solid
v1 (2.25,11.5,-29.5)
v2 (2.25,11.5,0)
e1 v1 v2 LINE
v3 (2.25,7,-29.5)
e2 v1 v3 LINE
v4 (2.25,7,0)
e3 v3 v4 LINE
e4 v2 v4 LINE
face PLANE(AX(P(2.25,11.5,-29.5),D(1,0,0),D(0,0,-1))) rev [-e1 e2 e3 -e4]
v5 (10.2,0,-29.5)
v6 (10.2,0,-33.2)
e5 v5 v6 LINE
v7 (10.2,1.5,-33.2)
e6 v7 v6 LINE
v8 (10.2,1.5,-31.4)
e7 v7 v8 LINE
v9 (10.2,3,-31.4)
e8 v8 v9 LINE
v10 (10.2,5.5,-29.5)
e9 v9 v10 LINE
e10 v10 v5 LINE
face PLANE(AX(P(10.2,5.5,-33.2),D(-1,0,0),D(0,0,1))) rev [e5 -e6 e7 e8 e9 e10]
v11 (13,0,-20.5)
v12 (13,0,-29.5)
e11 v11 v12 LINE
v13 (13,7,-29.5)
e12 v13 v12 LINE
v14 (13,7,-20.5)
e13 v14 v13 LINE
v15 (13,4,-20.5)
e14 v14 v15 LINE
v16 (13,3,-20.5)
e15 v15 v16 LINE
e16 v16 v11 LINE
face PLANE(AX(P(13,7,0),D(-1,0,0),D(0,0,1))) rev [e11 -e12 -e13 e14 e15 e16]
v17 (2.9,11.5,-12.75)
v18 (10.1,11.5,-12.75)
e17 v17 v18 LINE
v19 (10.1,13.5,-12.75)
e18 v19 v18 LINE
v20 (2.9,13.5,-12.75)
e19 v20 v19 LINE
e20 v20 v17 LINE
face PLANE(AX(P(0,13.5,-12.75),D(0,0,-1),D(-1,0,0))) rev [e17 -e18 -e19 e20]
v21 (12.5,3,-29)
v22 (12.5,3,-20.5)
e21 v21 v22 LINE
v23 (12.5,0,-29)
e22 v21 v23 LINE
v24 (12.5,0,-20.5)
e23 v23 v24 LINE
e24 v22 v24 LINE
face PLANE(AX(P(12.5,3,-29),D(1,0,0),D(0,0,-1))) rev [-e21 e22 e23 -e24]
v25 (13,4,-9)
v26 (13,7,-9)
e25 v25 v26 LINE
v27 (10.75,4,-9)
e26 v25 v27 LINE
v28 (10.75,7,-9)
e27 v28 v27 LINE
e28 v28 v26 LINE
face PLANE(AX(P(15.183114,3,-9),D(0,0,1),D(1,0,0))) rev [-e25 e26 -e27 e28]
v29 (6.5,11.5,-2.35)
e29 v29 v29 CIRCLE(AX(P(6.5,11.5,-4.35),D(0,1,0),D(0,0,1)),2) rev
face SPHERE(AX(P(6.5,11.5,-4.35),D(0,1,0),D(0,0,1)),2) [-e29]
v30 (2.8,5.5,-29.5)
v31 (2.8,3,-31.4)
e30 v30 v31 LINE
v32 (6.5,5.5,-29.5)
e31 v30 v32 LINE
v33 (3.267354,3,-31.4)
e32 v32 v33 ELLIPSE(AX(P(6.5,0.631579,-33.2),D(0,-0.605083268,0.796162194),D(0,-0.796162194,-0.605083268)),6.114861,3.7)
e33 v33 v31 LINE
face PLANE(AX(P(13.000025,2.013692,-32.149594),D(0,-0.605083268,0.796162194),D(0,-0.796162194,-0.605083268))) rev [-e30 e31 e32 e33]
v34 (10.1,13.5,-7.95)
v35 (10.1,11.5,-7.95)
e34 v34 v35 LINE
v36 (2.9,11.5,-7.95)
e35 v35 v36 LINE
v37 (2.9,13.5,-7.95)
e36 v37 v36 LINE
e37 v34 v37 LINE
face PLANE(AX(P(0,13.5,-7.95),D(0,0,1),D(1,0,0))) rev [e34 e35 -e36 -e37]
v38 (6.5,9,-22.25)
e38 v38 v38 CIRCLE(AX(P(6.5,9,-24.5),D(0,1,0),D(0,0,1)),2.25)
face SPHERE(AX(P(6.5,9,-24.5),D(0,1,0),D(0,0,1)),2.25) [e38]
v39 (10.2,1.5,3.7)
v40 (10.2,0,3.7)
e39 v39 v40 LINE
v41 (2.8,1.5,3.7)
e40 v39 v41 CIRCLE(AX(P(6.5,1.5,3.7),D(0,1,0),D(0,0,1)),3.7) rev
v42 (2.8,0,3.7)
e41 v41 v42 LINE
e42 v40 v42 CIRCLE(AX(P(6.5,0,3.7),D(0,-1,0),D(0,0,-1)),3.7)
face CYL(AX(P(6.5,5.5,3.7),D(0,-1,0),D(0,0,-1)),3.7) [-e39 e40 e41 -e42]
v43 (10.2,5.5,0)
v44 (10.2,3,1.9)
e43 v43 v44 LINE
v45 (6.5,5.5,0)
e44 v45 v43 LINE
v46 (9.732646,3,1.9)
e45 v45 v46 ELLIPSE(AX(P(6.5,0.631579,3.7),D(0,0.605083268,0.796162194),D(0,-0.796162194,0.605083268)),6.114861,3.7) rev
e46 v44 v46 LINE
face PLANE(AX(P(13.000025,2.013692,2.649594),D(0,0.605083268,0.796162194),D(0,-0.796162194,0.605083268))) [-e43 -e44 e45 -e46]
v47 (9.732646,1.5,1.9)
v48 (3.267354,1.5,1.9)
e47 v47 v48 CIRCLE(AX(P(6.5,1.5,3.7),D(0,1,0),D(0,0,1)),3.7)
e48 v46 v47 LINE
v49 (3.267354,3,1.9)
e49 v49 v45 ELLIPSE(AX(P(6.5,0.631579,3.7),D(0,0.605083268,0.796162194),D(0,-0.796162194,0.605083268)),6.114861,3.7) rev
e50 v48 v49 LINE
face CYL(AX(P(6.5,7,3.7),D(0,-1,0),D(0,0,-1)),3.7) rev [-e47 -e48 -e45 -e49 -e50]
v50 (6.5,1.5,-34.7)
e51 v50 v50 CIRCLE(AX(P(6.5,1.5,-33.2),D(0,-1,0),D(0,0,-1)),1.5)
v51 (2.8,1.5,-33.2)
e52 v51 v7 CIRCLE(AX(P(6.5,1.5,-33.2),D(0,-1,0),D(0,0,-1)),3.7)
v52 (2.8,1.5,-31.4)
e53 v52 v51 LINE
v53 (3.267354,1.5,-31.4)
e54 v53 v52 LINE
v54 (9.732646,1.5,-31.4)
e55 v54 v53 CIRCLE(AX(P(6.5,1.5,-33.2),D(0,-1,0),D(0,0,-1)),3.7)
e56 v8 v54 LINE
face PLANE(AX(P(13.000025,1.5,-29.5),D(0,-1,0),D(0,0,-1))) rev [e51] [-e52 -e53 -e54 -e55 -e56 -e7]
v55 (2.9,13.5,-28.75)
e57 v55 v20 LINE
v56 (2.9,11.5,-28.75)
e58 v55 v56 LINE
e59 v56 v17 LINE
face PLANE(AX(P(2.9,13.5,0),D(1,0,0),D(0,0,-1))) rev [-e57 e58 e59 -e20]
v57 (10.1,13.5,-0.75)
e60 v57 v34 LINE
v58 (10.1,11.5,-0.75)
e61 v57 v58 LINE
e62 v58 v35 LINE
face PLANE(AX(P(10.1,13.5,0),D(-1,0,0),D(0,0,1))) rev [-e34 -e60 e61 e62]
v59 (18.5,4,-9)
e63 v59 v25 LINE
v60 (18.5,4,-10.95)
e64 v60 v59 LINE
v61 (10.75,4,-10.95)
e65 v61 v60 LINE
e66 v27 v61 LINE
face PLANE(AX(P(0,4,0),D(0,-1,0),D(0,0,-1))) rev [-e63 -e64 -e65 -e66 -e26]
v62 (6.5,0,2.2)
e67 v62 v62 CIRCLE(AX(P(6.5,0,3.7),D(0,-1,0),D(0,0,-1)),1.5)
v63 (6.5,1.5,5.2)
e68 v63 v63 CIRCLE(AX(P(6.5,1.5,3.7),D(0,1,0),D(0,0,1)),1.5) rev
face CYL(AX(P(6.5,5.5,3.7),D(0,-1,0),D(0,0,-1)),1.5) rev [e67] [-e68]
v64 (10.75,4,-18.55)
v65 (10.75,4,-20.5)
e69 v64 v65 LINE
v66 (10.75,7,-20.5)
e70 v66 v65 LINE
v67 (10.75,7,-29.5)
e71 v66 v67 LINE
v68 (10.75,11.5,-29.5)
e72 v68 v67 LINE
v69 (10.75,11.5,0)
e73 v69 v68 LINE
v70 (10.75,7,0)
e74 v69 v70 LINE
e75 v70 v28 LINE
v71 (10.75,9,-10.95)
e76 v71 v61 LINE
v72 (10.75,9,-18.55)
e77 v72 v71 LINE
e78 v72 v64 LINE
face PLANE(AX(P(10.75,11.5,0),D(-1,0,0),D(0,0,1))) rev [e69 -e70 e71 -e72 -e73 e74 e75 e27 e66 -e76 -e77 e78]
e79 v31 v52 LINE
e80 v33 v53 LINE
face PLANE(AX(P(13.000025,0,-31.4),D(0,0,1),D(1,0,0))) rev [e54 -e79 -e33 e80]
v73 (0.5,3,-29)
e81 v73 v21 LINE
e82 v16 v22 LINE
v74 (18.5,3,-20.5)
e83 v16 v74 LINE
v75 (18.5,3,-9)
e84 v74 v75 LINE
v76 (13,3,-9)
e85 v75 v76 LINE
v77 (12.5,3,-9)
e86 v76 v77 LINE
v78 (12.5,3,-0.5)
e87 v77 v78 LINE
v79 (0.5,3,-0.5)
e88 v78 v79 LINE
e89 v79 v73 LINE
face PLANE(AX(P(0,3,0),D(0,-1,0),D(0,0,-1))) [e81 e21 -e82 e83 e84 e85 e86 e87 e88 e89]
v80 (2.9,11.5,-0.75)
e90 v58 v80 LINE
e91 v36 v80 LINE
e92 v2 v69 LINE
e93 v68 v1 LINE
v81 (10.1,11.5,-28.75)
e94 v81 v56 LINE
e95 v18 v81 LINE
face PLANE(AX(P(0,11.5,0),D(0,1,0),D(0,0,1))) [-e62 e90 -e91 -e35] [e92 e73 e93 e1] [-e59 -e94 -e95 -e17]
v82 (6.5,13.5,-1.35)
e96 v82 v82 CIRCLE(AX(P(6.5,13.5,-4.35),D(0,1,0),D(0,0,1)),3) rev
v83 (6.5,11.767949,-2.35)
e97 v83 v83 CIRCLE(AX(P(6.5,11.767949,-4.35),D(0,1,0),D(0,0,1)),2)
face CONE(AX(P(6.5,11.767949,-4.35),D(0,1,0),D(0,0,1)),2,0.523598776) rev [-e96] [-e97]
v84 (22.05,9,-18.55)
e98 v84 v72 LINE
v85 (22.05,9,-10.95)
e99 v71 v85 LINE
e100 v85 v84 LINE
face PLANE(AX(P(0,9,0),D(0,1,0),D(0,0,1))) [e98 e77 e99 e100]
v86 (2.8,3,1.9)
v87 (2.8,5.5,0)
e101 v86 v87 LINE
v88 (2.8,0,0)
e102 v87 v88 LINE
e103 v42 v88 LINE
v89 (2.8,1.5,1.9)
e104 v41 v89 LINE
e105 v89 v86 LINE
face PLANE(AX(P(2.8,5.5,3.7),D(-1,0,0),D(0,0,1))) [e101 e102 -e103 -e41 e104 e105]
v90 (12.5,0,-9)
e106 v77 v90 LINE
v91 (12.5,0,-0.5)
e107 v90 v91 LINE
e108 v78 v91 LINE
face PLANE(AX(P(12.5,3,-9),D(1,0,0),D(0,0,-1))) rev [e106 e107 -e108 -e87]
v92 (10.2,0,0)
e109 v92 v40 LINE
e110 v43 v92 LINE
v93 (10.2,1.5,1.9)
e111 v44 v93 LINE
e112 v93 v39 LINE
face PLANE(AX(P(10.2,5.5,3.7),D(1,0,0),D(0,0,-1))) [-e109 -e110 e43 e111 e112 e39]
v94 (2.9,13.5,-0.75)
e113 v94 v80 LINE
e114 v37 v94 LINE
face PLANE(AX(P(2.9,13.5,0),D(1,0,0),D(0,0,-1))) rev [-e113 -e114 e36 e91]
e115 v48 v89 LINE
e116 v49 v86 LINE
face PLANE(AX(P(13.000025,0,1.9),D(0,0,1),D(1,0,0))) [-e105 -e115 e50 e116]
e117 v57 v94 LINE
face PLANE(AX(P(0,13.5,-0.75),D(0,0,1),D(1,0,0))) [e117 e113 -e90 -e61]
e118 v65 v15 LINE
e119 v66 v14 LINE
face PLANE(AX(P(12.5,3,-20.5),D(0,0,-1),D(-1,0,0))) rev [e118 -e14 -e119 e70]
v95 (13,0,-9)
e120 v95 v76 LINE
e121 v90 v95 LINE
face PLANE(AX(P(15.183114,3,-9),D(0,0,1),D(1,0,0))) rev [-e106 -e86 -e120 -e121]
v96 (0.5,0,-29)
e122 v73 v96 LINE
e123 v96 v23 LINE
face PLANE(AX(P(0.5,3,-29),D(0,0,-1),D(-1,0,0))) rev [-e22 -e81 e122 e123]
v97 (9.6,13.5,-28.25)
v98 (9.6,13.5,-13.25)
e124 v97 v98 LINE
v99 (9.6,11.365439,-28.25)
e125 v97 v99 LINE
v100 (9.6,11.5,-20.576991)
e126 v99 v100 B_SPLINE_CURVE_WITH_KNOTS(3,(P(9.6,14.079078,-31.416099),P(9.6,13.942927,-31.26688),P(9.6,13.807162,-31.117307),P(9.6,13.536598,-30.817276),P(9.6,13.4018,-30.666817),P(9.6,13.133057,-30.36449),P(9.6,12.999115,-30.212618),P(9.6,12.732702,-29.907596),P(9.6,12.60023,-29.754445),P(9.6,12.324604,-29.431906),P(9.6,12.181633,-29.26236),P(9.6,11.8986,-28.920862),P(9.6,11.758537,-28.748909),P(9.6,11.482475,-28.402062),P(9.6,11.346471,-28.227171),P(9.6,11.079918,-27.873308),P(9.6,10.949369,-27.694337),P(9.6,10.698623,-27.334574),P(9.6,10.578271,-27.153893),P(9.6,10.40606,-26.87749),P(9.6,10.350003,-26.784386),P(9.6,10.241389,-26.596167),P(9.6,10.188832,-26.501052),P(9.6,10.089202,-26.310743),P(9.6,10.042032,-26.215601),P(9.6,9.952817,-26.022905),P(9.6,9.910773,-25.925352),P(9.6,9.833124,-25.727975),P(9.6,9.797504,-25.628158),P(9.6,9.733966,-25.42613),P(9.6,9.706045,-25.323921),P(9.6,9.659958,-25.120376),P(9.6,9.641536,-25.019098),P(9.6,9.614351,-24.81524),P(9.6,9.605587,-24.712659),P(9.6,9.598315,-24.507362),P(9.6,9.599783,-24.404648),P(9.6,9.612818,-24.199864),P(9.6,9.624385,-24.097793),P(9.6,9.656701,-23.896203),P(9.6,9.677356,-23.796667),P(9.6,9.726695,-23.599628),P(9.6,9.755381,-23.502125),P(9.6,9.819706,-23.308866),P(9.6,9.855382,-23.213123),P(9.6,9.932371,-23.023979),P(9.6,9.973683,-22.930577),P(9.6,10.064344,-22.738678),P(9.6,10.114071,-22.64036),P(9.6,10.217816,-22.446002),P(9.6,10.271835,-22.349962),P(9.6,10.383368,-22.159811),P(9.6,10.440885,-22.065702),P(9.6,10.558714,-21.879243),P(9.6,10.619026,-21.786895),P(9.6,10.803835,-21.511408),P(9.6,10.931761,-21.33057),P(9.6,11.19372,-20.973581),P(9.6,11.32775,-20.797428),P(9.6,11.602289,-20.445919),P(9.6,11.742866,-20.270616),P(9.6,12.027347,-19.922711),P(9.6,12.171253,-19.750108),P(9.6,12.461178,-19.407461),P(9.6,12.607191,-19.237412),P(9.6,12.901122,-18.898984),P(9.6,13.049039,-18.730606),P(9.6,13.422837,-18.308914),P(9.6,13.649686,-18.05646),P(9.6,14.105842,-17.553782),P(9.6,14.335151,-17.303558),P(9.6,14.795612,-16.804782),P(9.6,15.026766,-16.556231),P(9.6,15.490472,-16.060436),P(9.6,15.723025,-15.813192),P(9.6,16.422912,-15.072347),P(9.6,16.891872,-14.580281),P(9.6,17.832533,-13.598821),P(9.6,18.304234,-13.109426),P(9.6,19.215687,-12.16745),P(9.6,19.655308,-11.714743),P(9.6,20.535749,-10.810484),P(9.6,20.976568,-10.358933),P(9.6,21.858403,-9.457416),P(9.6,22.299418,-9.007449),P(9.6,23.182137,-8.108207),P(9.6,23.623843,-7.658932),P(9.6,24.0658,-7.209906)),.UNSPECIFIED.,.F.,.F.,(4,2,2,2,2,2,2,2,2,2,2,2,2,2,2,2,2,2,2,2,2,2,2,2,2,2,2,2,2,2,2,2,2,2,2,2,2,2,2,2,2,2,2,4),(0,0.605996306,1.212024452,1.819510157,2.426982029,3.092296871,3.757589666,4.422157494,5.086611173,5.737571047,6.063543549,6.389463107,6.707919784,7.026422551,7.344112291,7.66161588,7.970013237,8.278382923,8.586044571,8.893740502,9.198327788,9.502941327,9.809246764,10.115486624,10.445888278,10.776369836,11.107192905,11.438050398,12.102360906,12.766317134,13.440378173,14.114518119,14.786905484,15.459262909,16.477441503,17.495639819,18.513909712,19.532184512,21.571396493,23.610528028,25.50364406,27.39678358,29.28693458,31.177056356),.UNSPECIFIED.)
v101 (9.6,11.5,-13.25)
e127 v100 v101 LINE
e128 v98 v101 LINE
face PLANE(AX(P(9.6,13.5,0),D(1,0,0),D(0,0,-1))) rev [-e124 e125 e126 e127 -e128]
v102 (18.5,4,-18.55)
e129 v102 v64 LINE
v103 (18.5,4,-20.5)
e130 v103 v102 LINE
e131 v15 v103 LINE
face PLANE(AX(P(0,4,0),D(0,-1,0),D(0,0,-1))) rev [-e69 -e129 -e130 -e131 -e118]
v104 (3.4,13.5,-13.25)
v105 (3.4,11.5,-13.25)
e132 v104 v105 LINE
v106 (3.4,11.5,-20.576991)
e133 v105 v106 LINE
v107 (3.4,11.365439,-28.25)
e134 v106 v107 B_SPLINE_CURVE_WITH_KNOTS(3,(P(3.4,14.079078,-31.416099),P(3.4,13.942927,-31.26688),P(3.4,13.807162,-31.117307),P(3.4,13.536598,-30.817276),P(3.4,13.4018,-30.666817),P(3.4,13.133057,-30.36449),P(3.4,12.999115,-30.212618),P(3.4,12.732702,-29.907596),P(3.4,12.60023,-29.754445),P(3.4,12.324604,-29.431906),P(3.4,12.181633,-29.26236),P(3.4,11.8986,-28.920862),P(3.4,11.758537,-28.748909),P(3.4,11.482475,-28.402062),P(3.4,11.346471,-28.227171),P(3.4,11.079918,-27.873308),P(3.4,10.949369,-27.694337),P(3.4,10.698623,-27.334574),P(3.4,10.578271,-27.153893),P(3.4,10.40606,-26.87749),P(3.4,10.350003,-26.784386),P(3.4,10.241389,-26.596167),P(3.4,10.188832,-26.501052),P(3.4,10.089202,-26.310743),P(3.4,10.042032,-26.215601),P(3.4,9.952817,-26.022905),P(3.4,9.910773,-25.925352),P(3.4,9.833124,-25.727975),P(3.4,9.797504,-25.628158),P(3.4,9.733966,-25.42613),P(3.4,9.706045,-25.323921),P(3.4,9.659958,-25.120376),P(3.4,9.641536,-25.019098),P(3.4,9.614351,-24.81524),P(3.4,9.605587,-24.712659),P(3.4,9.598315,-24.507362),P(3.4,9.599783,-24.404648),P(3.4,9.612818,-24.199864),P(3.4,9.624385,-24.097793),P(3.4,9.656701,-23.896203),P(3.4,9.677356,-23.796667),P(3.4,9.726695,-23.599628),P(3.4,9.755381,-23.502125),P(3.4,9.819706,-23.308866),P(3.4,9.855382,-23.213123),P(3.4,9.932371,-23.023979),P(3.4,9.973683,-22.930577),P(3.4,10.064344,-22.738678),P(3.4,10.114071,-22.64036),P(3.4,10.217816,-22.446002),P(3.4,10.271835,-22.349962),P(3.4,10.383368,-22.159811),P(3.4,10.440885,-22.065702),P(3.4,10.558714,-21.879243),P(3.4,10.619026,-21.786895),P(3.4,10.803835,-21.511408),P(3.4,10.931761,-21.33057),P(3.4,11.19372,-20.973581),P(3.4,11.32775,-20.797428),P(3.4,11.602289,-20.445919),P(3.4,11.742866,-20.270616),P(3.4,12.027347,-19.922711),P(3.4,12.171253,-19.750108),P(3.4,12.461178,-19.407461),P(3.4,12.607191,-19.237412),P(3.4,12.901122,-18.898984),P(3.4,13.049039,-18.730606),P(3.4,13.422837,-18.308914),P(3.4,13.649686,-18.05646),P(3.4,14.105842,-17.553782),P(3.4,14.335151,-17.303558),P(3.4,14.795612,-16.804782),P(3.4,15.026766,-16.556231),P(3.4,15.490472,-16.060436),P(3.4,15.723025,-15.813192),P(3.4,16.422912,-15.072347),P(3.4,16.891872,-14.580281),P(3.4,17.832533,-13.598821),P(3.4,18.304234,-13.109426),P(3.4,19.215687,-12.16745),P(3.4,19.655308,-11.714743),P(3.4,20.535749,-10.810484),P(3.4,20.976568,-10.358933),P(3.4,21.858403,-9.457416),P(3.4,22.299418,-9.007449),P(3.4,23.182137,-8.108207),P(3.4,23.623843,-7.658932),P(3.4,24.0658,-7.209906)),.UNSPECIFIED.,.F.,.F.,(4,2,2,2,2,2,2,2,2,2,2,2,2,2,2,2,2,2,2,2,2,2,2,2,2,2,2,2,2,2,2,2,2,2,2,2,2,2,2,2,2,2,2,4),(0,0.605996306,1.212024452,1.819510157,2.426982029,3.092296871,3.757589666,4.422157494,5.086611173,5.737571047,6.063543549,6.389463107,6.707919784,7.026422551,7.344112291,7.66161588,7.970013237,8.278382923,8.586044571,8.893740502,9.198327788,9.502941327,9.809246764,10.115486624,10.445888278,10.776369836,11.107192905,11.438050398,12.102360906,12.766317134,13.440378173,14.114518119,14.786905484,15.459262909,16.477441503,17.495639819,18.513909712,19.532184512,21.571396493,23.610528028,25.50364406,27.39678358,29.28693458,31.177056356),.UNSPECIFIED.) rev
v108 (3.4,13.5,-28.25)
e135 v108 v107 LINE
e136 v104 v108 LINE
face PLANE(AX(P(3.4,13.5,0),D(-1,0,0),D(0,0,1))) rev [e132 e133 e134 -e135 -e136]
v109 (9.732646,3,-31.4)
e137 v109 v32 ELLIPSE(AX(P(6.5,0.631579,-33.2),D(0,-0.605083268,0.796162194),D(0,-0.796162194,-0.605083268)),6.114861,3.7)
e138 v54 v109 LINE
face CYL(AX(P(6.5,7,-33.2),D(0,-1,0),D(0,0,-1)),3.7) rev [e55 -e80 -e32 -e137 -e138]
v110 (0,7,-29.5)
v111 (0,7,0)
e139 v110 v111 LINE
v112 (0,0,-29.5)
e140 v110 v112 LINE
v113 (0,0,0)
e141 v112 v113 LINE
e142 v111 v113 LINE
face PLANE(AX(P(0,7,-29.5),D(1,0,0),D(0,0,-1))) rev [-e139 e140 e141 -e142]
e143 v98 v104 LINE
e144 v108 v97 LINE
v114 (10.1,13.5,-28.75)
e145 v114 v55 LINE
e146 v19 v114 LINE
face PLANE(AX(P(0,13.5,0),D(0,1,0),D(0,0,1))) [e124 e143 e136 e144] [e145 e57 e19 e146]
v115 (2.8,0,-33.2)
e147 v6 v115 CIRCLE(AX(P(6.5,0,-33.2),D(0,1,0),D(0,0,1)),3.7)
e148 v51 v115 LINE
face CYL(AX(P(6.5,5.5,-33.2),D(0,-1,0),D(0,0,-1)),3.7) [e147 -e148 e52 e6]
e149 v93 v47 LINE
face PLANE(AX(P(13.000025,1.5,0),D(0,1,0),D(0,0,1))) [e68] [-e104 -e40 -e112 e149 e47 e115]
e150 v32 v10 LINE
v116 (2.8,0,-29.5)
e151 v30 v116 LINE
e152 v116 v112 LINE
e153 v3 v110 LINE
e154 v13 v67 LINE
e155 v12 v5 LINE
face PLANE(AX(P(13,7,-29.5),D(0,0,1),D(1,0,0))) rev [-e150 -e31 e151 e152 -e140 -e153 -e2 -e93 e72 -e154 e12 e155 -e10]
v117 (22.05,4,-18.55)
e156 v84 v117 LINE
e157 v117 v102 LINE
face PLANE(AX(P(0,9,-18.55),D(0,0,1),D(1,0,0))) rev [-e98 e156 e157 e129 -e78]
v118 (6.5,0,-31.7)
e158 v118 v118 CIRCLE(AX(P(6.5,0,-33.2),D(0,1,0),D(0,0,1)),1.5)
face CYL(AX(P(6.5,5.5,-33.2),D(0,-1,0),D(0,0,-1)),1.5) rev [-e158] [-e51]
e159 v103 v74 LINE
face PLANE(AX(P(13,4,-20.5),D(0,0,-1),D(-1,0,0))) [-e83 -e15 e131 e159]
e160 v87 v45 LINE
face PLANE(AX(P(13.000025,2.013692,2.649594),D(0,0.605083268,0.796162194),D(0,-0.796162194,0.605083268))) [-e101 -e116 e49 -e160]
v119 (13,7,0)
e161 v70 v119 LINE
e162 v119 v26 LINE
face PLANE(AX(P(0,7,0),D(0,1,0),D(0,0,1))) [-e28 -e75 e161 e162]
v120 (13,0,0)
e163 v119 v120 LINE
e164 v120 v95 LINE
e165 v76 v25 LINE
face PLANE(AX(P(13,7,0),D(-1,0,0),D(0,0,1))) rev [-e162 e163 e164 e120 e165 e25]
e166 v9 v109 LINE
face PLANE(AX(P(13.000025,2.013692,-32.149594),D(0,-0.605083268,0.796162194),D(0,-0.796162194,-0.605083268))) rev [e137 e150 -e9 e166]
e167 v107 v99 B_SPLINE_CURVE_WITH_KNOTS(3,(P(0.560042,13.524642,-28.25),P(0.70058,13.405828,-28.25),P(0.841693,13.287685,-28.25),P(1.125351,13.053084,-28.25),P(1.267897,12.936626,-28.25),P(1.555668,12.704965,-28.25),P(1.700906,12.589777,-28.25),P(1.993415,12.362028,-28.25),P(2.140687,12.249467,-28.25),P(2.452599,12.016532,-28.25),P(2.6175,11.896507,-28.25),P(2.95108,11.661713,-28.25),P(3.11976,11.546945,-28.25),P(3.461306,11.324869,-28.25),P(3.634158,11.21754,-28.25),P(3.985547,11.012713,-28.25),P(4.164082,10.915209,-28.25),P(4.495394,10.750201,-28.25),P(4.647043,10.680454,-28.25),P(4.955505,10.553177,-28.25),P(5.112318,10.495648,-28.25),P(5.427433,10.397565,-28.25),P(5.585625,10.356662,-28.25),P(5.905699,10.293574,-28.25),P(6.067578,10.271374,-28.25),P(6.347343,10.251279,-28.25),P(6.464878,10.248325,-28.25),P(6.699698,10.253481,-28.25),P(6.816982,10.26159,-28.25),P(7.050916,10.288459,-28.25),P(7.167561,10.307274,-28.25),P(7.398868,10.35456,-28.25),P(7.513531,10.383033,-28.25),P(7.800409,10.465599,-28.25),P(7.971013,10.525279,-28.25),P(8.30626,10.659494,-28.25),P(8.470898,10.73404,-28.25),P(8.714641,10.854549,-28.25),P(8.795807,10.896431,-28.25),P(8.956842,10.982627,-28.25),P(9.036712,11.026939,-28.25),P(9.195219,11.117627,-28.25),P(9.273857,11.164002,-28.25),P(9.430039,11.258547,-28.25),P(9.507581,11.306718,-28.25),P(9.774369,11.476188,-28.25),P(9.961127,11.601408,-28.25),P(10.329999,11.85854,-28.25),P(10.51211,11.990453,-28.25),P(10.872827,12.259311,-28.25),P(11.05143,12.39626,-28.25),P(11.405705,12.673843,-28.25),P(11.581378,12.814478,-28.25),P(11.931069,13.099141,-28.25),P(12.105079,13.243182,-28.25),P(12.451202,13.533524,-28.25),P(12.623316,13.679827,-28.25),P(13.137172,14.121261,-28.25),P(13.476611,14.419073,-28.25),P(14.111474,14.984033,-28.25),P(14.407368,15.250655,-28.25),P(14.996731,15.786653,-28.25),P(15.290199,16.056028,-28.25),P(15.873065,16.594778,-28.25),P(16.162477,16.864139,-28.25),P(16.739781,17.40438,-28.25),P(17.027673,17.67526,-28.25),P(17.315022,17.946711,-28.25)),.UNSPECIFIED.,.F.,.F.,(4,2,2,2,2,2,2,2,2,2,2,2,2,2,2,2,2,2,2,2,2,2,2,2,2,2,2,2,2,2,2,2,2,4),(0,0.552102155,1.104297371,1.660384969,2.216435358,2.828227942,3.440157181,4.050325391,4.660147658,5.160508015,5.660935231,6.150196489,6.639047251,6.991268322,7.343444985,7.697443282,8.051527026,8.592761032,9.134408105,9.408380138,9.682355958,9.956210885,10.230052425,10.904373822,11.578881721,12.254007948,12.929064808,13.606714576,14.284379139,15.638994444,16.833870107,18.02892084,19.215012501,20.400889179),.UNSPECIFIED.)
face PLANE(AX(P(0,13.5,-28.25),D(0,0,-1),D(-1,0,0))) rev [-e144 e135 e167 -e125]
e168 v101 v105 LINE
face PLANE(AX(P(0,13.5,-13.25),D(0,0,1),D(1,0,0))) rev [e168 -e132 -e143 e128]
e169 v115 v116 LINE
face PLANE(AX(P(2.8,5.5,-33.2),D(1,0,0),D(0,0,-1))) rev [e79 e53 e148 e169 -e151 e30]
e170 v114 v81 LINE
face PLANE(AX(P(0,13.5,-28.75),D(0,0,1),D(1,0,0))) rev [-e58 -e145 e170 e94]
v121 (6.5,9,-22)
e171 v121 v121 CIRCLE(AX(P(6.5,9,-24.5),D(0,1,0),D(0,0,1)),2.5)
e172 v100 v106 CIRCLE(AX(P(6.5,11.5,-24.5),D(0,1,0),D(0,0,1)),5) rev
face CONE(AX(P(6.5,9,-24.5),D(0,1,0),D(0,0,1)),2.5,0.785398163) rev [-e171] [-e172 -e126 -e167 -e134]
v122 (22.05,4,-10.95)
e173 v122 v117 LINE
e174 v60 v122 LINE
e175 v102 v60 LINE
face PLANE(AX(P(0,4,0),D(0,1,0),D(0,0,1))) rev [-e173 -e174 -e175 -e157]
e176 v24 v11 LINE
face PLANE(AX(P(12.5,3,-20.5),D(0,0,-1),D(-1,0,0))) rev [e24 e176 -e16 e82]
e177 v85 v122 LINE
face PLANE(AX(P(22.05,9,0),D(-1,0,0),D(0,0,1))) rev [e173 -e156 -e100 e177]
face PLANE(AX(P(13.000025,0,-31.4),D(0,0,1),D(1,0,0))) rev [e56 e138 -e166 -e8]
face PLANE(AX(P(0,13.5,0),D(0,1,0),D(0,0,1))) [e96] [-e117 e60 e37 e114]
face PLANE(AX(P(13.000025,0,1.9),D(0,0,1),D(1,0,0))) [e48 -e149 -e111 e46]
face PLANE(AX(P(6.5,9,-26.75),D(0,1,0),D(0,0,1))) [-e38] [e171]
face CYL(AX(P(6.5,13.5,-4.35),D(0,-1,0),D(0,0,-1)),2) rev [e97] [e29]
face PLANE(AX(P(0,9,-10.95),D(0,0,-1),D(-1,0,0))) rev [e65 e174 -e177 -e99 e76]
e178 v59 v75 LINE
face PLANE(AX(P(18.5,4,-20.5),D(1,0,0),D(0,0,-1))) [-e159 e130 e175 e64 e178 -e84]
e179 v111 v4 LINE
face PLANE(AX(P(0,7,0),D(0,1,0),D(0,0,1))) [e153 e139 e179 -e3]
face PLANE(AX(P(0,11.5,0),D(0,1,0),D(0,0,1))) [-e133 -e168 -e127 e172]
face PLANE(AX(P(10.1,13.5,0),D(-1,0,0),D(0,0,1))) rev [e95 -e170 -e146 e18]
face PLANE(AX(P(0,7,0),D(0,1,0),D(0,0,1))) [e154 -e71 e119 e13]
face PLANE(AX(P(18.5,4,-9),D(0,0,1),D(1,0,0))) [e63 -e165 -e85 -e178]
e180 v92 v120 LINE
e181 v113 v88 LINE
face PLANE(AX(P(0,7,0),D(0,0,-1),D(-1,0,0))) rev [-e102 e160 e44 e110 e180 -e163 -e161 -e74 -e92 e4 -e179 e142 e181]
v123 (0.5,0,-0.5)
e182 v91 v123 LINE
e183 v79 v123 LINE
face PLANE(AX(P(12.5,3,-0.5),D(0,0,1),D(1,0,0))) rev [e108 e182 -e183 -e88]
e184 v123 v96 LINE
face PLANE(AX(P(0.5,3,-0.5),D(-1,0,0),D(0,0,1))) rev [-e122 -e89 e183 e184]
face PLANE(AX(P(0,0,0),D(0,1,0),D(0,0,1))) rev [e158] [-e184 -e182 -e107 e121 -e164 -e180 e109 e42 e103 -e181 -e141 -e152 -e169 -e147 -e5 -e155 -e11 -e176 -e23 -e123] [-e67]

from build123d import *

# Parameters (mm, degrees)
SKETCH_1_W          = 13
SKETCH_1_H          = 29.5
EXTRUDE_1_DEPTH     = 7
EXTRUDE_2_DEPTH     = 4.5
SKETCH_3_W          = 7.2
SKETCH_3_H          = 7.2
SKETCH_3_R          = 2
SKETCH_3_H_2        = 16
SKETCH_3_W_2        = 6.2
SKETCH_3_H_3        = 15
EXTRUDE_3_DEPTH     = 2
CHAMFER_1_SIZE      = 1
CHAMFER_1_SIZE2     = 1.732050808
EXTRUDE_4_DEPTH     = 2
SKETCH_8_R          = 1.5
EXTRUDE_5_DEPTH     = 5.5
CUT_EXTRUDE_1_DEPTH = 35.949964235
SKETCH_10_R         = 3.7
CUT_EXTRUDE_2_DEPTH = 5.5
CUT_EXTRUDE_3_DEPTH = 3
CUT_EXTRUDE_4_DEPTH = 41.507530164
EXTRUDE_6_DEPTH     = 1
SKETCH_14_W         = 11.3
SKETCH_14_H         = 7.6
EXTRUDE_7_DEPTH     = 5


with BuildPart() as part:
    # Эскиз1 → Бобышка-Вытянуть1 (new body)
    with BuildSketch(Plane(origin=(0, 0, 0), x_dir=(1, 0, 0), z_dir=(0, 1, 0))):
        with Locations((6.5, 14.75)):
            Rectangle(SKETCH_1_W, SKETCH_1_H)
    extrude_1 = extrude(amount=EXTRUDE_1_DEPTH)

    # Эскиз2 → Бобышка-Вытянуть2 (add)
    with BuildSketch(Plane(origin=(0, 7, 0), x_dir=(1, 0, 0), z_dir=(0, 1, 0))):
        Polygon((6.5, 29.5), (10.75, 29.5), (10.75, 0), (2.25, 0), (2.25, 29.5), align=None)
    extrude(amount=EXTRUDE_2_DEPTH)

    # Эскиз5 → Вырез-Повернуть2 (revolve, cut)
    with BuildSketch(Plane(origin=(6.5, 0, 0), x_dir=(0, 0, -1), z_dir=(1, 0, 0))):
        with BuildLine():
            Line((29.5, 11.5), (24.5, 11.5))
            Line((24.5, 11.5), (24.5, 11.25))
            ThreePointArc((24.5, 11.25), (26.090990258, 10.590990258), (26.75, 9))
            Line((26.75, 9), (27, 9))
            Line((27, 9), (29.5, 11.5))
        make_face()
    revolve(axis=Axis((6.5, 11.5, -24.5), (0, -1, 0)), mode=Mode.SUBTRACT)

    # Эскиз3 → Бобышка-Вытянуть3 (add)
    # profile 1 of 2: a face of its own
    with BuildSketch(Plane(origin=(0, 11.5, 0), x_dir=(1, 0, 0), z_dir=(0, 1, 0))):
        with Locations((6.5, 4.35)):
            Rectangle(SKETCH_3_W, SKETCH_3_H)
        with Locations((6.5, 4.35)):
            Circle(SKETCH_3_R, mode=Mode.SUBTRACT)
    # profile 2 of 2: a face of its own
    with BuildSketch(Plane(origin=(0, 11.5, 0), x_dir=(1, 0, 0), z_dir=(0, 1, 0))):
        with Locations((6.5, 20.75)):
            Rectangle(SKETCH_3_W, SKETCH_3_H_2)
        with Locations((6.5, 20.75)):
            Rectangle(SKETCH_3_W_2, SKETCH_3_H_3, mode=Mode.SUBTRACT)
    extrude(amount=EXTRUDE_3_DEPTH)

    # Эскиз4 → Повернуть1 (revolve)
    with BuildSketch(Plane(origin=(0, 11.5, 0), x_dir=(1, 0, 0), z_dir=(0, 1, 0))):
        with BuildLine():
            Line((4.5, 4.35), (6.5, 4.35))
            Line((6.5, 4.35), (8.5, 4.35))
            ThreePointArc((8.5, 4.35), (6.5, 6.35), (4.5, 4.35))
        make_face()
    revolve(axis=Axis((6.5, 11.5, -4.35), (1, 0, 0)))

    # Фаска1
    chamfer_1_edges = [part.edges().sort_by_distance(p)[0] for p in [
        (4.5, 13.5, -4.35),
    ]]
    chamfer_1_side = [part.faces().sort_by_distance(p)[0] for p in [
        (6.5, 13.5, -0.851823376),
    ]]
    chamfer(chamfer_1_edges, length=CHAMFER_1_SIZE, length2=CHAMFER_1_SIZE2, reference=chamfer_1_side[0])

    # Эскиз7 → Бобышка-Вытянуть4 (add)
    with BuildSketch(Plane(origin=(0, 11.5, 0), x_dir=(1, 0, 0), z_dir=(0, 1, 0))):
        Polygon((2.25, 29.5), (10.75, 29.5), (10.75, 28.25), (10.75, 20.186921916), (9.6, 20.186921916), (9.6, 28.25), (3.4, 28.25), (3.4, 20.186921916), (2.25, 20.186921916), (2.25, 28.25), align=None)
    extrude(amount=-EXTRUDE_4_DEPTH)

    # Эскиз8 → Бобышка-Вытянуть5 (add)
    with BuildSketch(Plane(origin=(0, 0, 0), x_dir=(-1, 0, 0), z_dir=(0, -1, 0))):
        with BuildLine():
            Line((-2.8, -3.7), (-2.8, 0))
            Line((-2.8, 0), (-10.2, 0))
            Line((-10.2, 0), (-10.2, -3.7))
            ThreePointArc((-10.2, -3.7), (-6.5, -7.4), (-2.8, -3.7))
        make_face()
        with Locations((-6.5, -3.7)):
            Circle(SKETCH_8_R, mode=Mode.SUBTRACT)
    extrude_5 = extrude(amount=-EXTRUDE_5_DEPTH)

    # Эскиз9 → Вырез-Вытянуть1 (cut, through all)
    with BuildSketch(Plane.ZY):
        Polygon((7.4, 8.09796148), (0, 5.5), (1.9, 3), (1.9, 1.5), (7.4, 1.5), (10.785462846, 4.144098561), align=None)
    cut_extrude_1 = extrude(amount=-CUT_EXTRUDE_1_DEPTH, mode=Mode.SUBTRACT)

    # Эскиз10 → Вырез-Вытянуть2 (cut)
    with BuildSketch(Plane(origin=(0, 1.5, 0), x_dir=(1, 0, 0), z_dir=(0, 1, 0))):
        with Locations((6.5, -3.7)):
            Circle(SKETCH_10_R)
    cut_extrude_2 = extrude(amount=CUT_EXTRUDE_2_DEPTH, mode=Mode.SUBTRACT)

    # Зеркальное отражение1: Бобышка-Вытянуть1, Бобышка-Вытянуть5, Вырез-Вытянуть1, Вырез-Вытянуть2 across plane
    add(extrude_1.mirror(Plane(origin=(0, 0, -14.75), x_dir=(1, 0, 0), z_dir=(0, 0, -1))))
    add(extrude_5.mirror(Plane(origin=(0, 0, -14.75), x_dir=(1, 0, 0), z_dir=(0, 0, -1))))
    add(cut_extrude_1.mirror(Plane(origin=(0, 0, -14.75), x_dir=(1, 0, 0), z_dir=(0, 0, -1))), mode=Mode.SUBTRACT)
    add(cut_extrude_2.mirror(Plane(origin=(0, 0, -14.75), x_dir=(1, 0, 0), z_dir=(0, 0, -1))), mode=Mode.SUBTRACT)

    # Эскиз11 → Вырез-Вытянуть3 (cut)
    with BuildSketch(Plane(origin=(0, 0, 0), x_dir=(-1, 0, 0), z_dir=(0, -1, 0))):
        Polygon((-12.5, 9), (-12.5, 0.5), (-0.5, 0.5), (-0.5, 29), (-12.5, 29), (-12.5, 20.5), (-15.183114384, 20.5), (-15.183114384, 9), align=None)
    extrude(amount=-CUT_EXTRUDE_3_DEPTH, mode=Mode.SUBTRACT)

    # Эскиз12 → Вырез-Вытянуть4 (cut, through all)
    with BuildSketch(Plane(origin=(0, 3, 0), x_dir=(-1, 0, 0), z_dir=(0, -1, 0))):
        Polygon((-13, 20.5), (-13, 9), (-12.5, 9), (-10.75, 9), (-10.75, 20.5), (-12.5, 20.5), align=None)
    extrude(amount=-CUT_EXTRUDE_4_DEPTH, mode=Mode.SUBTRACT)

    # Эскиз13 → Бобышка-Вытянуть6 (add)
    with BuildSketch(Plane(origin=(0, 3, 0), x_dir=(-1, 0, 0), z_dir=(0, -1, 0))):
        Polygon((-10.75, 9), (-10.75, 20.5), (-13, 20.5), (-18.5, 20.5), (-18.5, 9), align=None)
    extrude(amount=-EXTRUDE_6_DEPTH)

    # Эскиз14 → Бобышка-Вытянуть7 (add)
    with BuildSketch(Plane(origin=(0, 4, 0), x_dir=(1, 0, 0), z_dir=(0, 1, 0))):
        with Locations((16.4, 14.75)):
            Rectangle(SKETCH_14_W, SKETCH_14_H)
    extrude(amount=EXTRUDE_7_DEPTH)


solid = part.part
